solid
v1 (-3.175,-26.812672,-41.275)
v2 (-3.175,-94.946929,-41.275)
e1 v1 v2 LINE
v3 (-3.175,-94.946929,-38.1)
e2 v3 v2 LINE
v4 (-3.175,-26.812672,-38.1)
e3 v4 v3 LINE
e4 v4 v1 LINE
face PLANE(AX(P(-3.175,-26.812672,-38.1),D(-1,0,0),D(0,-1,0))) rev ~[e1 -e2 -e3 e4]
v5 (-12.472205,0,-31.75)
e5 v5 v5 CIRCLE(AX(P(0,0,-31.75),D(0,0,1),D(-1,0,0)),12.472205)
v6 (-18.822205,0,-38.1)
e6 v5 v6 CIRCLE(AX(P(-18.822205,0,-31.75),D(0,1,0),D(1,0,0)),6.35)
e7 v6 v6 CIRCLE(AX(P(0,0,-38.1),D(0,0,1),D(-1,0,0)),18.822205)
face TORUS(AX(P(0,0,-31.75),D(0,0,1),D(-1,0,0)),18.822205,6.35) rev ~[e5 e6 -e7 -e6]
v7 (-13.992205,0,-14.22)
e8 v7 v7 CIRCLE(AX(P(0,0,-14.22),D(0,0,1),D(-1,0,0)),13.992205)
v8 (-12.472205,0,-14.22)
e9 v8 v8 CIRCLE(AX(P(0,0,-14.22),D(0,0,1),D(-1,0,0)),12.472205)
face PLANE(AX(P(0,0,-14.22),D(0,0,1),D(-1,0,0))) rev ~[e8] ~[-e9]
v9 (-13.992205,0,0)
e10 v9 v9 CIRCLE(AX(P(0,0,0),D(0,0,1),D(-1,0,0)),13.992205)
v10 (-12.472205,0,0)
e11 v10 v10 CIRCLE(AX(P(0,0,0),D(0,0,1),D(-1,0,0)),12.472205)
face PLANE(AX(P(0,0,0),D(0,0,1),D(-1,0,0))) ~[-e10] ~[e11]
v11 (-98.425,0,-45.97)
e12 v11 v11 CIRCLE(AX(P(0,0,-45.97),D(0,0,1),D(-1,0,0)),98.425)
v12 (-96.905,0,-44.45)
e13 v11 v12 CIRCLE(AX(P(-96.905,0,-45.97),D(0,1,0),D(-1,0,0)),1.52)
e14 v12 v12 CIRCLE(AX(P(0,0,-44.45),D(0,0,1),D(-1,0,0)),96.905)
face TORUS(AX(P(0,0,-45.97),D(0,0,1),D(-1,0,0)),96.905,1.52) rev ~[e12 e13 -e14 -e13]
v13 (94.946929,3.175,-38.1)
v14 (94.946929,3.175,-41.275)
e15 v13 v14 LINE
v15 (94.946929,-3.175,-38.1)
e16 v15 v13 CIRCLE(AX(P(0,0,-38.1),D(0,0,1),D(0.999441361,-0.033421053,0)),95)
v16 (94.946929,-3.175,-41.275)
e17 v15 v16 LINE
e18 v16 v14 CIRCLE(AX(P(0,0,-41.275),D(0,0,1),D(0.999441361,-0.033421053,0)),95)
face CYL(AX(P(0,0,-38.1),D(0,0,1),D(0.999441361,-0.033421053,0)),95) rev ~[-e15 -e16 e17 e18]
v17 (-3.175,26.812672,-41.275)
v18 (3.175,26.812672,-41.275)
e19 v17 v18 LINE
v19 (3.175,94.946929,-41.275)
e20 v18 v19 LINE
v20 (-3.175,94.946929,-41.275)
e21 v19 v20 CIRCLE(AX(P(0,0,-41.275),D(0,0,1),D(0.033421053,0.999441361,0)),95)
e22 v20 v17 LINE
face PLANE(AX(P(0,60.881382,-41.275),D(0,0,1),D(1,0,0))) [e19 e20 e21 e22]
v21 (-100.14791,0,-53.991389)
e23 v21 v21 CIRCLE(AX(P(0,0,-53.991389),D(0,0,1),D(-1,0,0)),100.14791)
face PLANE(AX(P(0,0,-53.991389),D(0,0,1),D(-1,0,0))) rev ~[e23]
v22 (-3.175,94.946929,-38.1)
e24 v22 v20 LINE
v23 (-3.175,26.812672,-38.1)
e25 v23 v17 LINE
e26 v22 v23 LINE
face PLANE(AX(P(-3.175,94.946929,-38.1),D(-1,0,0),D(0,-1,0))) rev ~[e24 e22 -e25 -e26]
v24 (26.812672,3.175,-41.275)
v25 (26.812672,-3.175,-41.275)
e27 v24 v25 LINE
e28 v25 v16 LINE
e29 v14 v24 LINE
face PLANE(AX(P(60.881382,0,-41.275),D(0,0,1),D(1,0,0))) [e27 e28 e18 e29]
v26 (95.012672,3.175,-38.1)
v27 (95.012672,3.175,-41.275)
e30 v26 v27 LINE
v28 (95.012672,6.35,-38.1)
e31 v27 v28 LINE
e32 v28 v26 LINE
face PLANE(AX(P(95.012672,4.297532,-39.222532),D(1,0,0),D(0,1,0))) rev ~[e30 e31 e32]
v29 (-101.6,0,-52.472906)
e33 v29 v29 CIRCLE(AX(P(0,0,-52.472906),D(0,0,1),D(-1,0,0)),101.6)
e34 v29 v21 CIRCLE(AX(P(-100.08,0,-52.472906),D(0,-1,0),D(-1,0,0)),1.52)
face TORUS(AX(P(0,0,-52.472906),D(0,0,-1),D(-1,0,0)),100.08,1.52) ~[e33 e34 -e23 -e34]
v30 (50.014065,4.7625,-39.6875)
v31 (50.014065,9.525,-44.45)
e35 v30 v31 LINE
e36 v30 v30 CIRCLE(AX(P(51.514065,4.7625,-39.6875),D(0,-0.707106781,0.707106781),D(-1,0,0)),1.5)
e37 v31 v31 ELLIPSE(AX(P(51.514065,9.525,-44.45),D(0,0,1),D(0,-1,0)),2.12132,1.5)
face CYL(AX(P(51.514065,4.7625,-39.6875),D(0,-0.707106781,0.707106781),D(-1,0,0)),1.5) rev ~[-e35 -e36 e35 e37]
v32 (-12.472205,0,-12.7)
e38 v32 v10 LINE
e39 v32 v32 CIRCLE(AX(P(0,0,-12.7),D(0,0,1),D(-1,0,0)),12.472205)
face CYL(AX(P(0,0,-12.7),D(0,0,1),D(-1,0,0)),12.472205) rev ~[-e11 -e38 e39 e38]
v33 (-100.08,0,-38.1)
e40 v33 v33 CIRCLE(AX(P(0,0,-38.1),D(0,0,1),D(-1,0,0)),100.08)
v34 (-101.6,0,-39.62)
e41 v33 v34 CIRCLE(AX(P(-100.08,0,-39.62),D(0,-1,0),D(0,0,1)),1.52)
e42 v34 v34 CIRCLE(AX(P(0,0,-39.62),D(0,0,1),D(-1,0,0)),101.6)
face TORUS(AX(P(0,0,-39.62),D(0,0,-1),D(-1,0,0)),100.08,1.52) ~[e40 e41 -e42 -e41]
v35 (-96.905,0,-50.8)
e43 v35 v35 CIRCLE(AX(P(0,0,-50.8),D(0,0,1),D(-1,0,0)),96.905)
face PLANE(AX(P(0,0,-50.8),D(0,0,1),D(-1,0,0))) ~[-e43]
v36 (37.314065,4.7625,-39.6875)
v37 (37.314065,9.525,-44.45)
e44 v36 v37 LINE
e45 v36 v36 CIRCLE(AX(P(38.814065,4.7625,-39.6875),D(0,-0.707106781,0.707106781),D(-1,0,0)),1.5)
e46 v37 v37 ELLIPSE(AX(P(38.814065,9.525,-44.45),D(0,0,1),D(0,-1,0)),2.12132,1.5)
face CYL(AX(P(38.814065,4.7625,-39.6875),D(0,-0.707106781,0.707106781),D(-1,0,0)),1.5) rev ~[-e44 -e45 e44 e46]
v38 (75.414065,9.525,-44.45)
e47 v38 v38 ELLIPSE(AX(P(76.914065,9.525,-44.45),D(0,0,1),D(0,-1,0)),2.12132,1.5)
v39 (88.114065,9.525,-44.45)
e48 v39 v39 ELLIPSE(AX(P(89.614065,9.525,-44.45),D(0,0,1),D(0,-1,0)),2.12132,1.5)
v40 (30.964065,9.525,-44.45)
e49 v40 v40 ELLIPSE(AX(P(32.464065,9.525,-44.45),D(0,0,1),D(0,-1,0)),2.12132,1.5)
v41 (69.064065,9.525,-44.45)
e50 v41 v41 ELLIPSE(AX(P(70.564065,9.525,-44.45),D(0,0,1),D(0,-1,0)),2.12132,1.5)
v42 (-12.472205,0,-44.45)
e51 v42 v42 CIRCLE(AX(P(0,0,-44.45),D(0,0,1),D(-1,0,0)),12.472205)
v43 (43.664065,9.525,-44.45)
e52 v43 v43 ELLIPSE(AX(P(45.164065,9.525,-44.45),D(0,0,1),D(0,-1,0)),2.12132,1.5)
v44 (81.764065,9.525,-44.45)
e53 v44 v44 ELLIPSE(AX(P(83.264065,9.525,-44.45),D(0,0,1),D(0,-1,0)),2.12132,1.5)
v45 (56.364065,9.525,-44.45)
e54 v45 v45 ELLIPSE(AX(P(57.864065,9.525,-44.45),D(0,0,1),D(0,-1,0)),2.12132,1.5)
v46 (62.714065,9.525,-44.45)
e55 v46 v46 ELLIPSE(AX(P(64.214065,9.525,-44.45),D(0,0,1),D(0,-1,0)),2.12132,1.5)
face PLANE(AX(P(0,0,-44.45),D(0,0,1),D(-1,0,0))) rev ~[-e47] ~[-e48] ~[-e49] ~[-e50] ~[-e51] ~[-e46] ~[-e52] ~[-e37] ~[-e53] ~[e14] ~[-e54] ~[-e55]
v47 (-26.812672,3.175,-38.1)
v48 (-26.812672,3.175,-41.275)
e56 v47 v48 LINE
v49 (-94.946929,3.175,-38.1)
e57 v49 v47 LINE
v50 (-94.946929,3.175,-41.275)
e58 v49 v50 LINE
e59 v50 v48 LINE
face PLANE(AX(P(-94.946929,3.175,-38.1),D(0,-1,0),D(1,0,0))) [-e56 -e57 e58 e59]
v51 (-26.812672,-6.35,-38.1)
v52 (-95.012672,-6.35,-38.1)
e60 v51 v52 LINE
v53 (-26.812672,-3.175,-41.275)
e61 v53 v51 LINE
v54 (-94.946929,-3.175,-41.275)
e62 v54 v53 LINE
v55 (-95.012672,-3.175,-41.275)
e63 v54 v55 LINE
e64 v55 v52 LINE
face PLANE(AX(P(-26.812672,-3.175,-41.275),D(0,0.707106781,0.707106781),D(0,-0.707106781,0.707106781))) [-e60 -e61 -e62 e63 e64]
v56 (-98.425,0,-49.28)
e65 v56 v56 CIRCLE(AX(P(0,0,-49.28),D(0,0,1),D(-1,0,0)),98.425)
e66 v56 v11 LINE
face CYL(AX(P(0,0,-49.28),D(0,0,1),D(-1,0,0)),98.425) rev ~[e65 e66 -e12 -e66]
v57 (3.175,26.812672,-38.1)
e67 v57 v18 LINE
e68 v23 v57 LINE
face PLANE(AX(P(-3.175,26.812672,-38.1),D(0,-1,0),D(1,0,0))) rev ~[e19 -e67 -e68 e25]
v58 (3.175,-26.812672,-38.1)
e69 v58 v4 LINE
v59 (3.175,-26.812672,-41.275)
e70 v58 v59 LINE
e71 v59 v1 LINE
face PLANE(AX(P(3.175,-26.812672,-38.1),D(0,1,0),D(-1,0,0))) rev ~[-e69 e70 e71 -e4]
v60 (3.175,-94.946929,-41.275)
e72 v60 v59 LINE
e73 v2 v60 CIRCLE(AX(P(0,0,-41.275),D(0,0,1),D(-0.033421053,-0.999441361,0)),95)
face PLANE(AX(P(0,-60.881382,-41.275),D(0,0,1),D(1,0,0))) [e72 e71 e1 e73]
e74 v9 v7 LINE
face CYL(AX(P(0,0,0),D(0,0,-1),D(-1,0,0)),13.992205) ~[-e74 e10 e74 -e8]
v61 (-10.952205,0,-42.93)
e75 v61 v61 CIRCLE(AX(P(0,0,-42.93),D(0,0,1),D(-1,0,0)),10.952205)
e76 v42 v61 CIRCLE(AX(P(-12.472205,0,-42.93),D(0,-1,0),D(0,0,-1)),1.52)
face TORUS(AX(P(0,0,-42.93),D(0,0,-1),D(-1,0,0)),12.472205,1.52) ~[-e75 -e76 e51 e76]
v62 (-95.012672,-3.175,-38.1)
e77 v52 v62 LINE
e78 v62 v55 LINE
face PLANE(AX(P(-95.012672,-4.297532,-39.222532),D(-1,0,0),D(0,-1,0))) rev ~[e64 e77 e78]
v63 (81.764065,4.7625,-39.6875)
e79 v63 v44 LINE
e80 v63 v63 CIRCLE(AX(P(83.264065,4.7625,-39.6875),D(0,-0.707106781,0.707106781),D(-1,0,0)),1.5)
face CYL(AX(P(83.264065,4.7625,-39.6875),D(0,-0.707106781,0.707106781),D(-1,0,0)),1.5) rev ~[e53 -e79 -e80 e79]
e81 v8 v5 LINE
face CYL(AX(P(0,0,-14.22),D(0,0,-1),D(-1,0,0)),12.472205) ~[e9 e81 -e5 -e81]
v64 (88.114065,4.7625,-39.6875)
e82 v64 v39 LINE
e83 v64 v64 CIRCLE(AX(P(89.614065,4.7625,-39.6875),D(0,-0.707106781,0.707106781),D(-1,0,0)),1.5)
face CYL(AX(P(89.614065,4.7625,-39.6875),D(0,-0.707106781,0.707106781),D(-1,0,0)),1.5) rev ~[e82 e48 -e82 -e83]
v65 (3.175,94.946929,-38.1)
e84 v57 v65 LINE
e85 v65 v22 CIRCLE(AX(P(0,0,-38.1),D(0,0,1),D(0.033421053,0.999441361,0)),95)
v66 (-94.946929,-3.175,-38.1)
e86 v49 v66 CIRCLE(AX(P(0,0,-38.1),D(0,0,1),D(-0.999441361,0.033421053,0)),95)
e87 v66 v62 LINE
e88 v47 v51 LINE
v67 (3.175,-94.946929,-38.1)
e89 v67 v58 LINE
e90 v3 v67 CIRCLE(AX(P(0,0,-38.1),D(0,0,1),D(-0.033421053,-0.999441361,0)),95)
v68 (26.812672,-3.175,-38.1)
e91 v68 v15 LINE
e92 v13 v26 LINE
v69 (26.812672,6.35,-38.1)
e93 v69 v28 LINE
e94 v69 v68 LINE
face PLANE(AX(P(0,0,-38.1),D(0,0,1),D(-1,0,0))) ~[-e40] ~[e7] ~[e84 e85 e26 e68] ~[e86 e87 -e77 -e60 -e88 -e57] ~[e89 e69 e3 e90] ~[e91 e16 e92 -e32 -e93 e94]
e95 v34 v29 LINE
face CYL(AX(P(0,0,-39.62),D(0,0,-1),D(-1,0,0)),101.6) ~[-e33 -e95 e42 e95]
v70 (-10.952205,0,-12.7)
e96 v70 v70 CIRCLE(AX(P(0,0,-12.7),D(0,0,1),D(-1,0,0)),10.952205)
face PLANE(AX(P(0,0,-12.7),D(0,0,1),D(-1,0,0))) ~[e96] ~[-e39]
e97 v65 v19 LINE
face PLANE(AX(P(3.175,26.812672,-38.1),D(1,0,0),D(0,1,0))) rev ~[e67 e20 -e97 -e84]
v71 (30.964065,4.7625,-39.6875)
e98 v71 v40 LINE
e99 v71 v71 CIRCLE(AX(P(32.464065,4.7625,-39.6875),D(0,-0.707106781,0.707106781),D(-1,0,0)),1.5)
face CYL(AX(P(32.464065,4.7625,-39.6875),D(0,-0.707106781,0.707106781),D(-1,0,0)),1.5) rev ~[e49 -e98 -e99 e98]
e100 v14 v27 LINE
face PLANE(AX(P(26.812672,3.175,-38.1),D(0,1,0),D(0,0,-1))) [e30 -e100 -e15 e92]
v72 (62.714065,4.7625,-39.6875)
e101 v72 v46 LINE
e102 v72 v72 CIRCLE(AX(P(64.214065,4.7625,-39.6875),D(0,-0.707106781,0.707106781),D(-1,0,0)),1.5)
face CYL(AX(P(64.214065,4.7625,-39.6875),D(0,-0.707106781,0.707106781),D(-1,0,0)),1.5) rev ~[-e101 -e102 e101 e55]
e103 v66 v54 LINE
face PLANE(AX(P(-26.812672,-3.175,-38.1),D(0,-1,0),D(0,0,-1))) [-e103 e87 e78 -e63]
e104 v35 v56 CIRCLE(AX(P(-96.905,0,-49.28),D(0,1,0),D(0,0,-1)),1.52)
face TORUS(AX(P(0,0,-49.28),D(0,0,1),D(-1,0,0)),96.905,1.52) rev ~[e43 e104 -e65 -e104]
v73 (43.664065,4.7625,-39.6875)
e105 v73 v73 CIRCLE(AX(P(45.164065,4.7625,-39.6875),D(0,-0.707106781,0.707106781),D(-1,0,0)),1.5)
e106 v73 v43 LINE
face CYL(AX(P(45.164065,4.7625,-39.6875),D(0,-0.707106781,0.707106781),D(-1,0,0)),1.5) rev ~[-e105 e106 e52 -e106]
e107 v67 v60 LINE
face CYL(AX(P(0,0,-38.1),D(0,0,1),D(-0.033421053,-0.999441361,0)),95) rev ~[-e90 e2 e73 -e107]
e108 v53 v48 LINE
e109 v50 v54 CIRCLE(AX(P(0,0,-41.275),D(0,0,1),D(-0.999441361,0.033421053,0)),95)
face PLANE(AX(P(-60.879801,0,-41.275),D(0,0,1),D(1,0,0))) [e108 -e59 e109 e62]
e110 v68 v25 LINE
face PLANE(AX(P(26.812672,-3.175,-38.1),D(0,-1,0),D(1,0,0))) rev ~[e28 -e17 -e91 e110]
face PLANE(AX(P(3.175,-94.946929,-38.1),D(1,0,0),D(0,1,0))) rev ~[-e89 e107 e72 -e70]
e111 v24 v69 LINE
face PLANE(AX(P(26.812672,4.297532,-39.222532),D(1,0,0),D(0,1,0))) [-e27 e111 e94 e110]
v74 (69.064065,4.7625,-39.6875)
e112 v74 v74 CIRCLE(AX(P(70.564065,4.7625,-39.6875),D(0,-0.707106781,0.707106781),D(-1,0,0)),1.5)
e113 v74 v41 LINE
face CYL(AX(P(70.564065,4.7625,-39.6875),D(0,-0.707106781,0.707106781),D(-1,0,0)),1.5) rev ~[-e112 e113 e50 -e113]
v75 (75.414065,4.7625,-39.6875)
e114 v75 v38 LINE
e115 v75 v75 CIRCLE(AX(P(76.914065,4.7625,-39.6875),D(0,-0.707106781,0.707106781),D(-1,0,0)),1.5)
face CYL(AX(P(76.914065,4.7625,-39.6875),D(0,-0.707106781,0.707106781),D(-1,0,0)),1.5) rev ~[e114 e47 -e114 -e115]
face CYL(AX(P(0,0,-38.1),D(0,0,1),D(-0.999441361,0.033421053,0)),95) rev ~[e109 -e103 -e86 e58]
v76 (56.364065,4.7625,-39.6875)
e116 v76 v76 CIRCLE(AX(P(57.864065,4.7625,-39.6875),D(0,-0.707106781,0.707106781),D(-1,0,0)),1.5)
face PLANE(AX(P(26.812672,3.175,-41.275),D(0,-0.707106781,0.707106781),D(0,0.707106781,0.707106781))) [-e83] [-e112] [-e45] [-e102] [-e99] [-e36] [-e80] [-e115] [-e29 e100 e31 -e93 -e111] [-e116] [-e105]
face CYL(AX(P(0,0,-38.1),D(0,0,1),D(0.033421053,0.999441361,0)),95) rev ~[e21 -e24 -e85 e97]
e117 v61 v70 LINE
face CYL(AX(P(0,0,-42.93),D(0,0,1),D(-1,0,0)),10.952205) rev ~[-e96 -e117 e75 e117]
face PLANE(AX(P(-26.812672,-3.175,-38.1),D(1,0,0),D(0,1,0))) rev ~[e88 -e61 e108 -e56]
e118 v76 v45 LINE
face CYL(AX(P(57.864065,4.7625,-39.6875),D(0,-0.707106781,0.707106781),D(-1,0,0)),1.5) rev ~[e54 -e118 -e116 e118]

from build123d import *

# Parameters (mm, degrees)
F2_W     = 68.1342573444
F2_H     = 6.35
F3_DEPTH = 3.175
F5_DEPTH = 68.2
F7_DEPTH = 9
F9_DEPTH = 68.2


# Not quite as in the source:
# - a feature names something its author has since deleted; it is built from what else it names


with BuildPart() as f1:
    # F0 (on Front) → F1 (revolve)
    with BuildSketch(Plane.XZ):
        with BuildLine():
            Line((0, -53.9913885295), (0, -50.8))
            Line((0, -50.8), (-96.905, -50.8))
            ThreePointArc((-96.905, -50.8), (-97.9798023074, -50.3548023074), (-98.425, -49.28))
            Line((-98.425, -49.28), (-98.425, -45.97))
            ThreePointArc((-98.425, -45.97), (-97.9798023074, -44.8951976926), (-96.905, -44.45))
            Line((-96.905, -44.45), (-12.47220483, -44.45))
            ThreePointArc((-12.47220483, -44.45), (-11.3974025226, -44.0048023074), (-10.95220483, -42.93))
            Line((-10.95220483, -42.93), (-10.95220483, -39.62))
            Line((-10.95220483, -39.62), (-10.95220483, -38.1))
            Line((-10.95220483, -38.1), (-10.95220483, -36.58))
            Line((-10.95220483, -36.58), (-10.95220483, -12.7))
            Line((-10.95220483, -12.7), (-12.47220483, -12.7))
            Line((-12.47220483, -12.7), (-12.47220483, 0))
            Line((-12.47220483, 0), (-13.99220483, 0))
            Line((-13.99220483, 0), (-13.99220483, -12.7))
            Line((-13.99220483, -12.7), (-13.99220483, -14.22))
            Line((-13.99220483, -14.22), (-12.47220483, -14.22))
            Line((-12.47220483, -14.22), (-12.47220483, -31.75))
            ThreePointArc((-12.47220483, -31.75), (-14.3320767694, -36.2401280605), (-18.82220483, -38.1))
            Line((-18.82220483, -38.1), (-100.08, -38.1))
            ThreePointArc((-100.08, -38.1), (-101.1548023074, -38.5451976926), (-101.6, -39.62))
            Line((-101.6, -39.62), (-101.6, -52.4729063229))
            ThreePointArc((-101.6, -52.4729063229), (-101.1785498226, -53.5234244272), (-100.1479101482, -53.9913885295))
            Line((-100.1479101482, -53.9913885295), (0, -53.9913885295))
        make_face()
    revolve(axis=Axis((0, 0, 8.357311599), (0, 0, 1)))

    # F2 (on face) → F3 (cut)
    with BuildSketch(Plane.XY.offset(-38.1)):
        with BuildLine():
            Line((26.8126719109, -3.175), (94.9469292552, -3.175))
            ThreePointArc((94.9469292552, -3.175), (95, 0), (94.9469292552, 3.175))
            Line((94.9469292552, 3.175), (26.8126719109, 3.175))
            Line((26.8126719109, 3.175), (26.8126719109, -3.175))
        make_face()
        with BuildLine():
            Line((3.175, -94.9469292552), (3.175, -26.8126719109))
            Line((3.175, -26.8126719109), (-3.175, -26.8126719109))
            Line((-3.175, -26.8126719109), (-3.175, -94.9469292552))
            ThreePointArc((-3.175, -94.9469292552), (0, -95), (3.175, -94.9469292552))
        make_face()
        with Locations((-60.8798005831, 0)):
            Rectangle(F2_W, F2_H)
        with BuildLine():
            Line((-94.9469292552, -3.175), (-94.9469292552, 3.175))
            ThreePointArc((-94.9469292552, 3.175), (-95, 0), (-94.9469292552, -3.175))
        make_face()
        with BuildLine():
            Line((3.175, 26.8126719109), (3.175, 94.9469292552))
            ThreePointArc((3.175, 94.9469292552), (0, 95), (-3.175, 94.9469292552))
            Line((-3.175, 94.9469292552), (-3.175, 26.8126719109))
            Line((-3.175, 26.8126719109), (3.175, 26.8126719109))
        make_face()
    extrude(amount=-F3_DEPTH, mode=Mode.SUBTRACT)

    # F4 (on face) → F5 (cut)
    with BuildSketch(Plane(origin=(-26.8126719109, 0, 0), x_dir=(0, -1, 0), z_dir=(-1, 0, 0))):
        Polygon((6.35, -38.1), (3.175, -38.1), (3.175, -41.275), align=None)
    extrude(amount=F5_DEPTH, mode=Mode.SUBTRACT)

    # F6 (on face) → F7 (cut)
    with BuildSketch(Plane(origin=(0, 22.225, -22.225), x_dir=(1, 0, 0), z_dir=(0, -0.7071067812, 0.7071067812))):
        with BuildLine():
            Line((30.9640646577, -24.6957043329), (32.4640646577, -24.6957043329))
            Line((32.4640646577, -24.6957043329), (33.9640646577, -24.6957043329))
            ThreePointArc((33.9640646577, -24.6957043329), (32.4640646577, -23.1957043329), (30.9640646577, -24.6957043329))
        make_face()
        with BuildLine():
            Line((33.9640646577, -24.6957043329), (32.4640646577, -24.6957043329))
            Line((32.4640646577, -24.6957043329), (30.9640646577, -24.6957043329))
            ThreePointArc((30.9640646577, -24.6957043329), (32.4640646577, -26.1957043329), (33.9640646577, -24.6957043329))
        make_face()
        with BuildLine():
            ThreePointArc((91.1140646577, -24.6957043329), (89.6140646577, -23.1957043329), (88.1140646577, -24.6957043329))
            Line((88.1140646577, -24.6957043329), (89.6140646577, -24.6957043329))
            Line((89.6140646577, -24.6957043329), (91.1140646577, -24.6957043329))
        make_face()
        with BuildLine():
            Line((89.6140646577, -24.6957043329), (88.1140646577, -24.6957043329))
            ThreePointArc((88.1140646577, -24.6957043329), (89.6140646577, -26.1957043329), (91.1140646577, -24.6957043329))
            Line((91.1140646577, -24.6957043329), (89.6140646577, -24.6957043329))
        make_face()
        with BuildLine():
            ThreePointArc((84.7640646577, -24.6957043329), (83.2640646577, -23.1957043329), (81.7640646577, -24.6957043329))
            Line((81.7640646577, -24.6957043329), (83.2640646577, -24.6957043329))
            Line((83.2640646577, -24.6957043329), (84.7640646577, -24.6957043329))
        make_face()
        with BuildLine():
            Line((83.2640646577, -24.6957043329), (81.7640646577, -24.6957043329))
            ThreePointArc((81.7640646577, -24.6957043329), (83.2640646577, -26.1957043329), (84.7640646577, -24.6957043329))
            Line((84.7640646577, -24.6957043329), (83.2640646577, -24.6957043329))
        make_face()
        with BuildLine():
            ThreePointArc((78.4140646577, -24.6957043329), (76.9140646577, -23.1957043329), (75.4140646577, -24.6957043329))
            Line((75.4140646577, -24.6957043329), (76.9140646577, -24.6957043329))
            Line((76.9140646577, -24.6957043329), (78.4140646577, -24.6957043329))
        make_face()
        with BuildLine():
            Line((76.9140646577, -24.6957043329), (75.4140646577, -24.6957043329))
            ThreePointArc((75.4140646577, -24.6957043329), (76.9140646577, -26.1957043329), (78.4140646577, -24.6957043329))
            Line((78.4140646577, -24.6957043329), (76.9140646577, -24.6957043329))
        make_face()
        with BuildLine():
            ThreePointArc((72.0640646577, -24.6957043329), (70.5640646577, -23.1957043329), (69.0640646577, -24.6957043329))
            Line((69.0640646577, -24.6957043329), (70.5640646577, -24.6957043329))
            Line((70.5640646577, -24.6957043329), (72.0640646577, -24.6957043329))
        make_face()
        with BuildLine():
            Line((70.5640646577, -24.6957043329), (69.0640646577, -24.6957043329))
            ThreePointArc((69.0640646577, -24.6957043329), (70.5640646577, -26.1957043329), (72.0640646577, -24.6957043329))
            Line((72.0640646577, -24.6957043329), (70.5640646577, -24.6957043329))
        make_face()
        with BuildLine():
            ThreePointArc((65.7140646577, -24.6957043329), (64.2140646577, -23.1957043329), (62.7140646577, -24.6957043329))
            Line((62.7140646577, -24.6957043329), (64.2140646577, -24.6957043329))
            Line((64.2140646577, -24.6957043329), (65.7140646577, -24.6957043329))
        make_face()
        with BuildLine():
            Line((64.2140646577, -24.6957043329), (62.7140646577, -24.6957043329))
            ThreePointArc((62.7140646577, -24.6957043329), (64.2140646577, -26.1957043329), (65.7140646577, -24.6957043329))
            Line((65.7140646577, -24.6957043329), (64.2140646577, -24.6957043329))
        make_face()
        with BuildLine():
            ThreePointArc((59.3640646577, -24.6957043329), (57.8640646577, -23.1957043329), (56.3640646577, -24.6957043329))
            Line((56.3640646577, -24.6957043329), (57.8640646577, -24.6957043329))
            Line((57.8640646577, -24.6957043329), (59.3640646577, -24.6957043329))
        make_face()
        with BuildLine():
            Line((57.8640646577, -24.6957043329), (56.3640646577, -24.6957043329))
            ThreePointArc((56.3640646577, -24.6957043329), (57.8640646577, -26.1957043329), (59.3640646577, -24.6957043329))
            Line((59.3640646577, -24.6957043329), (57.8640646577, -24.6957043329))
        make_face()
        with BuildLine():
            ThreePointArc((53.0140646577, -24.6957043329), (51.5140646577, -23.1957043329), (50.0140646577, -24.6957043329))
            Line((50.0140646577, -24.6957043329), (51.5140646577, -24.6957043329))
            Line((51.5140646577, -24.6957043329), (53.0140646577, -24.6957043329))
        make_face()
        with BuildLine():
            Line((51.5140646577, -24.6957043329), (50.0140646577, -24.6957043329))
            ThreePointArc((50.0140646577, -24.6957043329), (51.5140646577, -26.1957043329), (53.0140646577, -24.6957043329))
            Line((53.0140646577, -24.6957043329), (51.5140646577, -24.6957043329))
        make_face()
        with BuildLine():
            ThreePointArc((46.6640646577, -24.6957043329), (45.1640646577, -23.1957043329), (43.6640646577, -24.6957043329))
            Line((43.6640646577, -24.6957043329), (45.1640646577, -24.6957043329))
            Line((45.1640646577, -24.6957043329), (46.6640646577, -24.6957043329))
        make_face()
        with BuildLine():
            Line((45.1640646577, -24.6957043329), (43.6640646577, -24.6957043329))
            ThreePointArc((43.6640646577, -24.6957043329), (45.1640646577, -26.1957043329), (46.6640646577, -24.6957043329))
            Line((46.6640646577, -24.6957043329), (45.1640646577, -24.6957043329))
        make_face()
        with BuildLine():
            ThreePointArc((40.3140646577, -24.6957043329), (38.8140646577, -23.1957043329), (37.3140646577, -24.6957043329))
            Line((37.3140646577, -24.6957043329), (38.8140646577, -24.6957043329))
            Line((38.8140646577, -24.6957043329), (40.3140646577, -24.6957043329))
        make_face()
        with BuildLine():
            Line((38.8140646577, -24.6957043329), (37.3140646577, -24.6957043329))
            ThreePointArc((37.3140646577, -24.6957043329), (38.8140646577, -26.1957043329), (40.3140646577, -24.6957043329))
            Line((40.3140646577, -24.6957043329), (38.8140646577, -24.6957043329))
        make_face()
    extrude(amount=-F7_DEPTH, mode=Mode.SUBTRACT)

    # F8 (on face) → F9 (cut)
    with BuildSketch(Plane.YZ.offset(26.8126719109)):
        Polygon((6.35, -38.1), (3.175, -38.1), (3.175, -41.275), align=None)
    extrude(amount=F9_DEPTH, mode=Mode.SUBTRACT)


solid = f1.part
